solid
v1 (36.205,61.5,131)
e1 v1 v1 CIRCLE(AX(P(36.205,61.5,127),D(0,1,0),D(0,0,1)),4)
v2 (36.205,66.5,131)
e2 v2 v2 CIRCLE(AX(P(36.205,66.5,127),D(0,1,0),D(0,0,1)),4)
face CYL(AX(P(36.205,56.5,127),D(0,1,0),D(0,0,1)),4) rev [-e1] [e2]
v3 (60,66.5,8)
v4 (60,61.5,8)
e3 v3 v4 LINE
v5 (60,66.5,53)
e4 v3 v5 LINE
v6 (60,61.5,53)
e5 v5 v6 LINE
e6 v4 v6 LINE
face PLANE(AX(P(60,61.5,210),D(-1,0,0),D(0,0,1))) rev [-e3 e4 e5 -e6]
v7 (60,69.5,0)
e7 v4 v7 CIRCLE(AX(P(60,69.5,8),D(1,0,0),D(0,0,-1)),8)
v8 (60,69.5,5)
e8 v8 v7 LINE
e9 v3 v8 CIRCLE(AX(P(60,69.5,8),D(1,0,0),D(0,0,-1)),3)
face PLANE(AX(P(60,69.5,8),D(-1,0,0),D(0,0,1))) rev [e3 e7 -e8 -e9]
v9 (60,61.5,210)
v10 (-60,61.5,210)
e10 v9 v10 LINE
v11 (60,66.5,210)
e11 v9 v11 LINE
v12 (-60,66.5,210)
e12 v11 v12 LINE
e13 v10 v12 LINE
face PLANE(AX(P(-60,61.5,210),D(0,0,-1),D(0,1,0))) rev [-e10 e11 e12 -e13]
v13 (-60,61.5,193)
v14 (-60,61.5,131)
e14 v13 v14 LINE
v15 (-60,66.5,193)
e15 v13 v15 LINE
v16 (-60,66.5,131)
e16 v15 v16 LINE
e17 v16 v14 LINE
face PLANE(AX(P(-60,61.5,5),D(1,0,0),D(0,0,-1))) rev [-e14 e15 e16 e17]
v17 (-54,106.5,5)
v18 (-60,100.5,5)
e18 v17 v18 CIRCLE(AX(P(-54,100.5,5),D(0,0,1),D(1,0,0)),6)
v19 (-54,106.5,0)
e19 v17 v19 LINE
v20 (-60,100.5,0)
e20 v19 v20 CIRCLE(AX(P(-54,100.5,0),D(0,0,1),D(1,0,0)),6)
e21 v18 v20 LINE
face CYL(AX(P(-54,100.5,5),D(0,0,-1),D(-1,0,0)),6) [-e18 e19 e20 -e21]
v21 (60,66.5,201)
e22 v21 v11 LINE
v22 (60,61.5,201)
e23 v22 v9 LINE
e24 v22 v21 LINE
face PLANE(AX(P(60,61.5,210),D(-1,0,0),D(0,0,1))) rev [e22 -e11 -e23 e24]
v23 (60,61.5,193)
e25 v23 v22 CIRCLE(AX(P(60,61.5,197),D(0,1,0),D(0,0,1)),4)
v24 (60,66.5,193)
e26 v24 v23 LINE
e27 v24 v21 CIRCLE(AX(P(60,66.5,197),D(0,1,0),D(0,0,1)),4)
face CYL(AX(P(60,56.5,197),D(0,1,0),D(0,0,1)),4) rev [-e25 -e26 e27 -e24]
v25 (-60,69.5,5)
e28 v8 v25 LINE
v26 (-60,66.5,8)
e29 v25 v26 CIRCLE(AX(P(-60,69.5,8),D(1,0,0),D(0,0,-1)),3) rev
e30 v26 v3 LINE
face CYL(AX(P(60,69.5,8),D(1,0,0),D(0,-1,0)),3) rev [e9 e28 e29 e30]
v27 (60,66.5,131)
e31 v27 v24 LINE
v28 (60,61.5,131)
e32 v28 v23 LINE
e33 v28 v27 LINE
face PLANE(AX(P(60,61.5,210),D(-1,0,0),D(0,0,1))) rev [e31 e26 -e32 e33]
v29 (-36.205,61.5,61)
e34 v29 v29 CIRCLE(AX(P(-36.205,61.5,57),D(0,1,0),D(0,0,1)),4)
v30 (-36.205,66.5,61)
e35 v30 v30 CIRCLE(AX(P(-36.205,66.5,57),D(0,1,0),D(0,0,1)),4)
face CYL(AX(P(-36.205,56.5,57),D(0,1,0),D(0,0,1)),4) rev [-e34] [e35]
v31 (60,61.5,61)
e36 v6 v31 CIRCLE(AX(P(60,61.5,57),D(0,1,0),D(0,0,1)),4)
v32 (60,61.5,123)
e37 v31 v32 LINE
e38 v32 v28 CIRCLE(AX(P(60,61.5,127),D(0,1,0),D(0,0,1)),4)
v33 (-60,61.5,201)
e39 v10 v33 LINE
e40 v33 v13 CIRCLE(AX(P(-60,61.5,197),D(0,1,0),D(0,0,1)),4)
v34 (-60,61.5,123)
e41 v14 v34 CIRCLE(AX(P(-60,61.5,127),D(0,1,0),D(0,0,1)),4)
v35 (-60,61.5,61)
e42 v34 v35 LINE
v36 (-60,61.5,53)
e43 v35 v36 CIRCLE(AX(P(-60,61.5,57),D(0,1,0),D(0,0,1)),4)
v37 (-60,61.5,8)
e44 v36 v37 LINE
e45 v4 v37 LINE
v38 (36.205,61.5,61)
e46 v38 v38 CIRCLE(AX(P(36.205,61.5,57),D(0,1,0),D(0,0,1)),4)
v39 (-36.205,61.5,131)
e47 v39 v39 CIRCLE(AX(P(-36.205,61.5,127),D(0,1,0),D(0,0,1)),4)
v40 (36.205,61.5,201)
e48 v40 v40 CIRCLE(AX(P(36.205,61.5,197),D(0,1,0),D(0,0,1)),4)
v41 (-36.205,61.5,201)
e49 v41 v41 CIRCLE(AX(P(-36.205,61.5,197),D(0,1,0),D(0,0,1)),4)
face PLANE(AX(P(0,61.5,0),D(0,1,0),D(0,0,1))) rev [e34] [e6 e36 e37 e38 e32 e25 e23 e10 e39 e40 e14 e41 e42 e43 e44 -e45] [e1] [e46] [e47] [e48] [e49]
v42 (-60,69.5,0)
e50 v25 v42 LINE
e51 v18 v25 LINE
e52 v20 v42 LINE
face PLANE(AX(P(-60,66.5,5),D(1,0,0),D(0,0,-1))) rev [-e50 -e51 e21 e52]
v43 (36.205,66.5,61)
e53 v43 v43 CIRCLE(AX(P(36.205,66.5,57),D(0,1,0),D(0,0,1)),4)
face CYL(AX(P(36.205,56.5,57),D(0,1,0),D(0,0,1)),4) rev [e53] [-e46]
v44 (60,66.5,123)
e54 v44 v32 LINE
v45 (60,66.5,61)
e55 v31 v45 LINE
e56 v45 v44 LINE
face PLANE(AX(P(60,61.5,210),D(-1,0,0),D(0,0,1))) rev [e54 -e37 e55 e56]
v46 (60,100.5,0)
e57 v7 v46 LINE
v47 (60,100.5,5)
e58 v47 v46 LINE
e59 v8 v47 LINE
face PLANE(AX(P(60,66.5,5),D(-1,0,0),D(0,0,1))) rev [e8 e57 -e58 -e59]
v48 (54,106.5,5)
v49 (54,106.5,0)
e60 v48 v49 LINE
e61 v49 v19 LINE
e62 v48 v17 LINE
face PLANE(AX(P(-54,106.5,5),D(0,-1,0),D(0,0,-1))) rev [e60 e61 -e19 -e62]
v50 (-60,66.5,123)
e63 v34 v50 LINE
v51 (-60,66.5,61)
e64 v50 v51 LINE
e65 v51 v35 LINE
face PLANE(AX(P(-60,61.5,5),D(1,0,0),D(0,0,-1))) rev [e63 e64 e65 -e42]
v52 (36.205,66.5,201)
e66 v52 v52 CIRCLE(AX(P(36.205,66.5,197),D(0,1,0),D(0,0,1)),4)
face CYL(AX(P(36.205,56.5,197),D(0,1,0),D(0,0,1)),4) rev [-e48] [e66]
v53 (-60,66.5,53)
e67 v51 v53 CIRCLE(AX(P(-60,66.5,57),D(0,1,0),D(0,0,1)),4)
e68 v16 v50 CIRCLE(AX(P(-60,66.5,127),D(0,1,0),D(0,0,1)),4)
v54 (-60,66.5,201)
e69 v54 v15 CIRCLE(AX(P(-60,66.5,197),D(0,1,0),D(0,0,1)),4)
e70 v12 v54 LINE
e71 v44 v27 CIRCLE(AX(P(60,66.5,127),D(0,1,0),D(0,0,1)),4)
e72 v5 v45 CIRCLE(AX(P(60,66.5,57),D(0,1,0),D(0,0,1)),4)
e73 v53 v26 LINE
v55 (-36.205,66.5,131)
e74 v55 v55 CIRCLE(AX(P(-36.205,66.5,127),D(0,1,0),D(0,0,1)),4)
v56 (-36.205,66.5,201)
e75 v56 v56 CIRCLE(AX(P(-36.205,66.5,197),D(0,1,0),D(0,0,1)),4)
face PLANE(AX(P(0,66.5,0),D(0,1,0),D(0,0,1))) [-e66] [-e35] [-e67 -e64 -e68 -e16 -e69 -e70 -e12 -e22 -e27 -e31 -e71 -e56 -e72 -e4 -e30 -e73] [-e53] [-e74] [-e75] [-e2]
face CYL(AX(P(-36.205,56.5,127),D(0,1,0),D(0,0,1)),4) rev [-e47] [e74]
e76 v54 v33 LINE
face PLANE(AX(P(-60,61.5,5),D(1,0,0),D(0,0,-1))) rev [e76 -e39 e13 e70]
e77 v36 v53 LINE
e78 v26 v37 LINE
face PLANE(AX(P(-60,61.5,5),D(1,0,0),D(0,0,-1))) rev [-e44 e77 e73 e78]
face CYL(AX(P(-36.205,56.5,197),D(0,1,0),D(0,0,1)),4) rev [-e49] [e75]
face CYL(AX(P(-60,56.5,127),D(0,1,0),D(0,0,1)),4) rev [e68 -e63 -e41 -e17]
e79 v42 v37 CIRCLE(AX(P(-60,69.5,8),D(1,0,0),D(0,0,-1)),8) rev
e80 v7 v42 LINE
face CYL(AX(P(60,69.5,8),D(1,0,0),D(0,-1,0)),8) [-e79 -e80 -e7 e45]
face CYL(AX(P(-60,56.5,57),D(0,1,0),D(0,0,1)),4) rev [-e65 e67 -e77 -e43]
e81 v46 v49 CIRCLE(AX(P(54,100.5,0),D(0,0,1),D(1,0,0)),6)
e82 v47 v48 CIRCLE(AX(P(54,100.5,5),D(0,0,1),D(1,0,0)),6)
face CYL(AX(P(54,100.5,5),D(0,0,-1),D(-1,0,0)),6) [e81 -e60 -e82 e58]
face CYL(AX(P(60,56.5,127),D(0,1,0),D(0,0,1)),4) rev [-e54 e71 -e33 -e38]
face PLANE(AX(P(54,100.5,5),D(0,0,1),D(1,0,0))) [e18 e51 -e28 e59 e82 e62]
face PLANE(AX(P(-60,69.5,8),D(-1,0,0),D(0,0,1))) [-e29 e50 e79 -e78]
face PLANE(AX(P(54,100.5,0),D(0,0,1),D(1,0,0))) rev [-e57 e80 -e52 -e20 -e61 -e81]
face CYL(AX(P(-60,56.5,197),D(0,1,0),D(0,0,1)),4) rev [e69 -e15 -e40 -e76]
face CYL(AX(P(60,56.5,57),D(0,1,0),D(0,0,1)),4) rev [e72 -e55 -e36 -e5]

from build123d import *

# Parameters (mm, degrees)
BASE_FLANGE2_DEPTH           = 5
EDGE_FLANGE3_STRIP_W         = 26
EDGE_FLANGE3_STRIP_H         = 5
EDGE_FLANGE3_STRIP_CUT_DEPTH = 120
EDGE_FLANGE3_DEPTH           = 120
SKETCH18_R                   = 4
CUT_EXTRUDE1_DEPTH           = 10


# Sheet-metal steps are written as plain solids
with BuildPart() as part:
    # Sketch1 → Base-Flange2 (new body)
    with BuildSketch(Plane.XY):
        with BuildLine():
            Line((60, 66.5), (60, 100.5))
            ThreePointArc((60, 100.5), (58.242640687, 104.742640687), (54, 106.5))
            Line((54, 106.5), (-54, 106.5))
            ThreePointArc((-54, 106.5), (-58.242640687, 104.742640687), (-60, 100.5))
            Line((-60, 100.5), (-60, 66.5))
            Line((-60, 66.5), (60, 66.5))
        make_face()
    extrude(amount=BASE_FLANGE2_DEPTH)

    # Edge-Flange3 strip (across the edge) → Edge-Flange3 strip cut (cut)
    with BuildSketch(Plane(origin=(-60, 66.5, 5), x_dir=(0, 1, 0), z_dir=(1, 0, 0))):
        with Locations((-10, -2.5)):
            Rectangle(EDGE_FLANGE3_STRIP_W, EDGE_FLANGE3_STRIP_H)
    extrude(amount=EDGE_FLANGE3_STRIP_CUT_DEPTH, mode=Mode.SUBTRACT)

    # Edge-Flange3 section (across the edge) → Edge-Flange3 (add)
    with BuildSketch(Plane(origin=(-60, 66.5, 5), x_dir=(0, 1, 0), z_dir=(1, 0, 0))):
        with BuildLine():
            Line((-5, 3), (-5, 205))
            Line((-5, 205), (0, 205))
            Line((0, 205), (0, 3))
            ThreePointArc((0, 3), (0.878679656, 0.878679656), (3, 0))
            Line((3, 0), (3, -5))
            ThreePointArc((3, -5), (-2.656854249, -2.656854249), (-5, 3))
        make_face()
    extrude(amount=EDGE_FLANGE3_DEPTH)

    # Sketch18 → Cut-Extrude1 (cut)
    with BuildSketch(Plane(origin=(0, 66.5, 0), x_dir=(1, 0, 0), z_dir=(0, 1, 0))):
        with Locations(Location((36.205, -197, 0), (0, 0, 270))):
            Circle(SKETCH18_R)
        with Locations(Location((-36.205, -197, 0), (0, 0, 270))):
            Circle(SKETCH18_R)
        with Locations(Location((-36.205, -127, 0), (0, 0, 270))):
            Circle(SKETCH18_R)
        with Locations(Location((36.205, -127, 0), (0, 0, 270))):
            Circle(SKETCH18_R)
        with Locations(Location((36.205, -57, 0), (0, 0, 270))):
            Circle(SKETCH18_R)
        with Locations(Location((-36.205, -57, 0), (0, 0, 270))):
            Circle(SKETCH18_R)
        with Locations((-60, -197)):
            Circle(SKETCH18_R)
        with Locations((-60, -127)):
            Circle(SKETCH18_R)
        with Locations((-60, -57)):
            Circle(SKETCH18_R)
        with Locations((60, -197)):
            Circle(SKETCH18_R)
        with Locations((60, -127)):
            Circle(SKETCH18_R)
        with Locations((60, -57)):
            Circle(SKETCH18_R)
    extrude(amount=-CUT_EXTRUDE1_DEPTH, mode=Mode.SUBTRACT)


solid = part.part
